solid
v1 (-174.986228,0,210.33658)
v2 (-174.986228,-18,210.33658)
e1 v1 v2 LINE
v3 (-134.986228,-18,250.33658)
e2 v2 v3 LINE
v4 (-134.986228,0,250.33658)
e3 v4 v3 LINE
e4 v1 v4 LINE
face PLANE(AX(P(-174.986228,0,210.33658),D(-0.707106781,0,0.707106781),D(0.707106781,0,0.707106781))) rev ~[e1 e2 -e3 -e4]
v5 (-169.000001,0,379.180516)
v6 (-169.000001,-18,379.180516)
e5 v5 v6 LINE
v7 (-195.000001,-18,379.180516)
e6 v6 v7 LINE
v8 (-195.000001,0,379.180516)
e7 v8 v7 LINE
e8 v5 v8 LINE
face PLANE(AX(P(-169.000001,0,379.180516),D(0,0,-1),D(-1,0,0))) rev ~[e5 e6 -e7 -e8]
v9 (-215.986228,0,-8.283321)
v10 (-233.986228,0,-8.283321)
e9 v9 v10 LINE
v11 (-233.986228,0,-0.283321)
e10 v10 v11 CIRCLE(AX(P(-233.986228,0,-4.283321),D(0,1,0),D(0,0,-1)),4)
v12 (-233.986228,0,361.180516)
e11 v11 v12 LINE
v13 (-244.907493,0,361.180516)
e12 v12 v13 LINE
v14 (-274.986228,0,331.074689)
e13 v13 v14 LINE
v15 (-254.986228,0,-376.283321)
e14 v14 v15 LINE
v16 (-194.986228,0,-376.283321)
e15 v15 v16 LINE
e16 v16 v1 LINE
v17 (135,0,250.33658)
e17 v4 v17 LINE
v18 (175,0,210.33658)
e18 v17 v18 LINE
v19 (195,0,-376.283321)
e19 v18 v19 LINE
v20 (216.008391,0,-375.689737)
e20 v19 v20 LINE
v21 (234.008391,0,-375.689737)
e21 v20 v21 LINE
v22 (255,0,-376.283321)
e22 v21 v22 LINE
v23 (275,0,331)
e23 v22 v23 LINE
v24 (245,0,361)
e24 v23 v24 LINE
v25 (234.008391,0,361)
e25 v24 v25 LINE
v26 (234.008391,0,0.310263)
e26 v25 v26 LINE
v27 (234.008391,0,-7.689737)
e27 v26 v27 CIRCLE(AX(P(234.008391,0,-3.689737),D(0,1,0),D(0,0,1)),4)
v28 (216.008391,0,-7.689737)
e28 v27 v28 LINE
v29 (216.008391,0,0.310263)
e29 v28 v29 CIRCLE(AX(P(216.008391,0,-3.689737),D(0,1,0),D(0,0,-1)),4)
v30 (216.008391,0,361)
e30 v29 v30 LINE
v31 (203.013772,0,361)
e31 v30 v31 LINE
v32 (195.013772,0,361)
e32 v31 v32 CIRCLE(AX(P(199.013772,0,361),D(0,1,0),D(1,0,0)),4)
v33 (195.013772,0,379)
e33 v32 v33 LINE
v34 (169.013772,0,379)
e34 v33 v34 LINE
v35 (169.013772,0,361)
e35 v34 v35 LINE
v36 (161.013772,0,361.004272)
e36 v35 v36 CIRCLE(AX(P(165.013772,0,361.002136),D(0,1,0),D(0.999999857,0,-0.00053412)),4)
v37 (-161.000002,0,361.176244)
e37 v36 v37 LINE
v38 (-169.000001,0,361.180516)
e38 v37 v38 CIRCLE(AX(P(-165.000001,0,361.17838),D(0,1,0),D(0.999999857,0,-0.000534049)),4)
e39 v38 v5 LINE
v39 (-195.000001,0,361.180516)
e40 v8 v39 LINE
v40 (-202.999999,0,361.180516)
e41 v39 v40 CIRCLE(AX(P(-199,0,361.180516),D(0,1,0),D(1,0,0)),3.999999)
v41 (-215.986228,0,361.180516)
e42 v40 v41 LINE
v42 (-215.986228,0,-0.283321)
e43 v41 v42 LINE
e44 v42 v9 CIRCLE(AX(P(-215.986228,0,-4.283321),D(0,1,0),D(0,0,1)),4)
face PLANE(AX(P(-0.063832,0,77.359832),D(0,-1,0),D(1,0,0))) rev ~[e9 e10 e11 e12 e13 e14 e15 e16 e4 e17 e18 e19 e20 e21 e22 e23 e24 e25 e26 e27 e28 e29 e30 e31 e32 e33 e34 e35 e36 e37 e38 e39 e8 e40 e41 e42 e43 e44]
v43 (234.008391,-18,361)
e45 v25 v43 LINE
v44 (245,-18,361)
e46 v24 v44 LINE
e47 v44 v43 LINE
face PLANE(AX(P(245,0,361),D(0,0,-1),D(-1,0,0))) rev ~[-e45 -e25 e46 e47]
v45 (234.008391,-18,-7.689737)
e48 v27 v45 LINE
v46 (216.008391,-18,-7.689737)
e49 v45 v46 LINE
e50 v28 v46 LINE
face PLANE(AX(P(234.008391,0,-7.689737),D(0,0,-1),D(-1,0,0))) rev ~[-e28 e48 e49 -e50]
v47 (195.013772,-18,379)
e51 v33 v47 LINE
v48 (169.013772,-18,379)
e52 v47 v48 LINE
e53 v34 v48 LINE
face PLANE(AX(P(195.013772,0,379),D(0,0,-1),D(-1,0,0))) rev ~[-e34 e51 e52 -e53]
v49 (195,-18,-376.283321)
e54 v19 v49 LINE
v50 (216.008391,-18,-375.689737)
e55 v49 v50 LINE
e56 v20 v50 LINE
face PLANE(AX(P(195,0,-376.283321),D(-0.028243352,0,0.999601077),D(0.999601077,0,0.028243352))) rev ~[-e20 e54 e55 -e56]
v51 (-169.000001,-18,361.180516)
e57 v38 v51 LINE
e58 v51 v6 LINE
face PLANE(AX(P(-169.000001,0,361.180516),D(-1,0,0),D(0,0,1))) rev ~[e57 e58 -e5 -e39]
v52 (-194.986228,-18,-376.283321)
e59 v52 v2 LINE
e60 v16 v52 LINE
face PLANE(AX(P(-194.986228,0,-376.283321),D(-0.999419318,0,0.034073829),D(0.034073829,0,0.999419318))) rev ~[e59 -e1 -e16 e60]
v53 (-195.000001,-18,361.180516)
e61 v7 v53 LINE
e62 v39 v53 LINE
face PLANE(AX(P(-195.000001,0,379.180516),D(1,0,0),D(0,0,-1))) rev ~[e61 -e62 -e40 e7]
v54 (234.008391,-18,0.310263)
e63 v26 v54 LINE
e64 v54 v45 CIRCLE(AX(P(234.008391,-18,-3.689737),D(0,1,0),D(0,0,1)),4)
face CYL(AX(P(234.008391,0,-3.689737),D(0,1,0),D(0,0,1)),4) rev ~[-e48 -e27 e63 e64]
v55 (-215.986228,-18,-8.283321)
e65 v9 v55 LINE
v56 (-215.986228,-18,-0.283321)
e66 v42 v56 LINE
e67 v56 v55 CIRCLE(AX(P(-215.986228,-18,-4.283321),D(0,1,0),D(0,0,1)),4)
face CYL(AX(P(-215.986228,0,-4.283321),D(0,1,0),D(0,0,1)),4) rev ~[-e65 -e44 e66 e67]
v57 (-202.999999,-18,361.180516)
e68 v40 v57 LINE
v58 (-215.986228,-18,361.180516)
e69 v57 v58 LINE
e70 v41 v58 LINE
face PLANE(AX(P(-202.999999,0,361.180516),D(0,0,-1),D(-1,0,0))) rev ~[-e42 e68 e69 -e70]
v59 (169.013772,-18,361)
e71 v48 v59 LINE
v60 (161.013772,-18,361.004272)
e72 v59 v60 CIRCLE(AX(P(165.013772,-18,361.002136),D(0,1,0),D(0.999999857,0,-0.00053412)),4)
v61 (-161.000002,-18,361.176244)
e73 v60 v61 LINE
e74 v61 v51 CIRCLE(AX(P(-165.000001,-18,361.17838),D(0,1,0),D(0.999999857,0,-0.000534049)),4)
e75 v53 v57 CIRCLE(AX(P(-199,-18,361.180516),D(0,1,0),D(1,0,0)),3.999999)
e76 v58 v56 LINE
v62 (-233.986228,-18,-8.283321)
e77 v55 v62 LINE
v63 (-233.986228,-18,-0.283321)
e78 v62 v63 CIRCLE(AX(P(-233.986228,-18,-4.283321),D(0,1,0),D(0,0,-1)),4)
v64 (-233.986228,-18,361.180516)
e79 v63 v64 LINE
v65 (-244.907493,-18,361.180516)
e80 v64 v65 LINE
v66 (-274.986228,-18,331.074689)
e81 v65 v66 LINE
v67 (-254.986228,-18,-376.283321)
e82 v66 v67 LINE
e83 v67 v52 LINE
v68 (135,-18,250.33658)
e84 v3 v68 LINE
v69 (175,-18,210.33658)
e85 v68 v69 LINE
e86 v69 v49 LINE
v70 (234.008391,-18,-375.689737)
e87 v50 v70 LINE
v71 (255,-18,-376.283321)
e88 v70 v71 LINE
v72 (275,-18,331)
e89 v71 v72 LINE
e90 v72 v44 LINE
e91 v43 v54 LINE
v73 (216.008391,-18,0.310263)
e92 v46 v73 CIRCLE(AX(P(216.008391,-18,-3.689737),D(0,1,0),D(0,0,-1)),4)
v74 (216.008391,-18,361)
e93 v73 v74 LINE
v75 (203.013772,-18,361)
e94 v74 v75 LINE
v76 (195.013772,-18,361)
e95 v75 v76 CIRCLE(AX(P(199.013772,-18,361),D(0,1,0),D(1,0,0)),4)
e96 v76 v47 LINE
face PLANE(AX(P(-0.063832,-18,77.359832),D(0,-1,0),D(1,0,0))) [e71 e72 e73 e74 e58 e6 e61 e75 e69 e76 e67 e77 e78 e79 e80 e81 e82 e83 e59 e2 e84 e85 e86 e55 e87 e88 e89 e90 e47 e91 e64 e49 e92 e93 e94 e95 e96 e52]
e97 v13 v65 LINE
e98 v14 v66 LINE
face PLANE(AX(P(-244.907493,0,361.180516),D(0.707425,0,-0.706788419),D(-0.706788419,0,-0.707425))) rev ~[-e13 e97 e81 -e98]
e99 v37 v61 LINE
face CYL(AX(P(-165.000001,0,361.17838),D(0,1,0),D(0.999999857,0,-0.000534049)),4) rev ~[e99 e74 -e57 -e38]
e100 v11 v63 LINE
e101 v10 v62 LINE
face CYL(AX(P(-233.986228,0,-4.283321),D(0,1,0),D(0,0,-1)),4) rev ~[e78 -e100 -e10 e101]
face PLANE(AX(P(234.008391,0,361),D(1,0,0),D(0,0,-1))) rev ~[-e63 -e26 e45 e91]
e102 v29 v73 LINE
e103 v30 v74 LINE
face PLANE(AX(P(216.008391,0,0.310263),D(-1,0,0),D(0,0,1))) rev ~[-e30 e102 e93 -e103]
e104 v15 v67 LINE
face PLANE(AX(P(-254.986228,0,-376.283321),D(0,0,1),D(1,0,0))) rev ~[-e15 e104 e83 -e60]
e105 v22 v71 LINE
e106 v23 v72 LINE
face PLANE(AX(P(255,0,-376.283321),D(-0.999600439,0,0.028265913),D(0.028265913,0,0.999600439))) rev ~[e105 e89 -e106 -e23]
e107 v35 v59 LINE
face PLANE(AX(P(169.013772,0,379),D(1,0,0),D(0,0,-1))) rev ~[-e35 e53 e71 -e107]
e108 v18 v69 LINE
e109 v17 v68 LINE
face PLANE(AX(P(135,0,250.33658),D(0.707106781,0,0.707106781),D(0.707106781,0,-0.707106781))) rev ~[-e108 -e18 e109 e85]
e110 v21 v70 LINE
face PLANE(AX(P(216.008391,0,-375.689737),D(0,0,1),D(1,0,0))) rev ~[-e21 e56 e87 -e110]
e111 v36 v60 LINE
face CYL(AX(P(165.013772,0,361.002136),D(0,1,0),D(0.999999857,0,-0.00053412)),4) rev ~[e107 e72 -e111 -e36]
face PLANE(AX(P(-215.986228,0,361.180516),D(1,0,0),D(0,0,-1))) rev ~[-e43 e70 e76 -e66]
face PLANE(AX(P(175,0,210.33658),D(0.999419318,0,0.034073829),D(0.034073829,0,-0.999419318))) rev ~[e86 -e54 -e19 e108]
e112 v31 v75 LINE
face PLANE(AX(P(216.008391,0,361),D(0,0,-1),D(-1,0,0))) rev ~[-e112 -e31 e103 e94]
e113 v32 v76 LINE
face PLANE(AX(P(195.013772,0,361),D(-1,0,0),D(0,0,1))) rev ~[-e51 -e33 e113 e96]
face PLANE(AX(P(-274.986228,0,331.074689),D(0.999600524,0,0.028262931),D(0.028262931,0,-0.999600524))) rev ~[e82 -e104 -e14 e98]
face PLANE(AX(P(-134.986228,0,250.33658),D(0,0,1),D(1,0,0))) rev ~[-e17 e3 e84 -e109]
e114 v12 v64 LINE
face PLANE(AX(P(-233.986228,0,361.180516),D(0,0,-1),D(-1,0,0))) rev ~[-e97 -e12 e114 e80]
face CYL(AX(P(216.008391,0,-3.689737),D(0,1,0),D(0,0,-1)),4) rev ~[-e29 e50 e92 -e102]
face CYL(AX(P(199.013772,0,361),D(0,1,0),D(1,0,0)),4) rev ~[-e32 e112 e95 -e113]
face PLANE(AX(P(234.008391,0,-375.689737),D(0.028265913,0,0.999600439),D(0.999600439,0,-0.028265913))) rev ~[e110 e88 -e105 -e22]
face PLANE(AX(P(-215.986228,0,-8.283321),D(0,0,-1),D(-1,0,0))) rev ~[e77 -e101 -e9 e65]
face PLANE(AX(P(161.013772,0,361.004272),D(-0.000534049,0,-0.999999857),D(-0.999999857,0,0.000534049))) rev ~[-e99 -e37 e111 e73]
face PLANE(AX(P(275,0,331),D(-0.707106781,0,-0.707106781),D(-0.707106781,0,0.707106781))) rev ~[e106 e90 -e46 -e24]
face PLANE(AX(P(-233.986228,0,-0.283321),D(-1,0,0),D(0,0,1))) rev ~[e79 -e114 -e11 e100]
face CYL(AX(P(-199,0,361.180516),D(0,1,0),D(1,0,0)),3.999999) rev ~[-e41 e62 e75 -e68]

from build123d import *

# Parameters (mm, degrees)
F1_DEPTH = 18


# Not quite as in the source:
# - ends of sketch curves that miss each other by under 0.0002 mm in the source are joined


with BuildPart() as f1:
    # F0 (on Front) → F1 (new body)
    with BuildSketch(Plane.XZ):
        with BuildLine():
            Line((195.0137715405, 361), (195.0137715405, 379))
            Line((195.0137715405, 379), (169.0137715405, 379))
            Line((169.0137715405, 379), (169.0137715405, 361.0021361967))
            Line((169.0137715405, 361.0021361967), (169.0137715405, 361))
            ThreePointArc((169.0137715405, 361), (165.0116353441, 357.0021367671), (161.0137721109, 361.0042723931))
            Line((161.0137721109, 361.0042723931), (-161.0000017113, 361.1762435819))
            ThreePointArc((-161.0000017113, 361.1762435819), (-165.0021373372, 357.1783803487), (-169.0000005704, 361.1805159746))
            Line((-169.0000005704, 361.1805159746), (-169.0000005704, 379.1805159746))
            Line((-169.0000005704, 379.1805159746), (-195.0000005704, 379.1805159746))
            Line((-195.0000005704, 379.1805159746), (-195.0000005704, 361.1805160001))
            ThreePointArc((-195.0000005704, 361.1805160001), (-199, 357.1805165706), (-202.9999994296, 361.1805160001))
            Line((-202.9999994296, 361.1805160001), (-215.9862284595, 361.1805160001))
            Line((-215.9862284595, 361.1805160001), (-215.9862284595, -0.2833213137))
            ThreePointArc((-215.9862284595, -0.2833213137), (-211.9862284595, -4.2833213137), (-215.9862284595, -8.2833213137))
            Line((-215.9862284595, -8.2833213137), (-233.9862284595, -8.2833213137))
            ThreePointArc((-233.9862284595, -8.2833213137), (-237.9862284595, -4.2833213137), (-233.9862284595, -0.2833213137))
            Line((-233.9862284595, -0.2833213137), (-233.9862284595, 361.1805160001))
            Line((-233.9862284595, 361.1805160001), (-244.90749278, 361.1805160001))
            Line((-244.90749278, 361.1805160001), (-274.9862284595, 331.0746893941))
            Line((-274.9862284595, 331.0746893941), (-254.9862284595, -376.2833213137))
            Line((-254.9862284595, -376.2833213137), (-233.9862284595, -376.2833213137))
            Line((-233.9862284595, -376.2833213137), (-215.9862284595, -376.2833213137))
            Line((-215.9862284595, -376.2833213137), (-194.9862284595, -376.2833213137))
            Line((-194.9862284595, -376.2833213137), (-174.9862284595, 210.3365797868))
            Line((-174.9862284595, 210.3365797868), (-134.9862284595, 250.3365797868))
            Line((-134.9862284595, 250.3365797868), (135, 250.3365797868))
            Line((135, 250.3365797868), (175, 210.3365797868))
            Line((175, 210.3365797868), (195, -376.2833213137))
            Line((195, -376.2833213137), (216.0083907756, -375.6897371419))
            Line((216.0083907756, -375.6897371419), (234.0083907756, -375.6897371419))
            Line((234.0083907756, -375.6897371419), (255, -376.2833213137))
            Line((255, -376.2833213137), (275, 331))
            Line((275, 331), (245, 361))
            Line((245, 361), (234.0083907756, 361))
            Line((234.0083907756, 361), (234.0083907756, 0.3102628581))
            ThreePointArc((234.0083907756, 0.3102628581), (238.0083907756, -3.6897371419), (234.0083907756, -7.6897371419))
            Line((234.0083907756, -7.6897371419), (216.0083907756, -7.6897371419))
            ThreePointArc((216.0083907756, -7.6897371419), (212.0083907756, -3.6897371419), (216.0083907756, 0.3102628581))
            Line((216.0083907756, 0.3102628581), (216.0083907756, 361))
            Line((216.0083907756, 361), (203.0137715405, 361))
            ThreePointArc((203.0137715405, 361), (199.0137715405, 357), (195.0137715405, 361))
        make_face()
    extrude(amount=F1_DEPTH)


solid = f1.part
